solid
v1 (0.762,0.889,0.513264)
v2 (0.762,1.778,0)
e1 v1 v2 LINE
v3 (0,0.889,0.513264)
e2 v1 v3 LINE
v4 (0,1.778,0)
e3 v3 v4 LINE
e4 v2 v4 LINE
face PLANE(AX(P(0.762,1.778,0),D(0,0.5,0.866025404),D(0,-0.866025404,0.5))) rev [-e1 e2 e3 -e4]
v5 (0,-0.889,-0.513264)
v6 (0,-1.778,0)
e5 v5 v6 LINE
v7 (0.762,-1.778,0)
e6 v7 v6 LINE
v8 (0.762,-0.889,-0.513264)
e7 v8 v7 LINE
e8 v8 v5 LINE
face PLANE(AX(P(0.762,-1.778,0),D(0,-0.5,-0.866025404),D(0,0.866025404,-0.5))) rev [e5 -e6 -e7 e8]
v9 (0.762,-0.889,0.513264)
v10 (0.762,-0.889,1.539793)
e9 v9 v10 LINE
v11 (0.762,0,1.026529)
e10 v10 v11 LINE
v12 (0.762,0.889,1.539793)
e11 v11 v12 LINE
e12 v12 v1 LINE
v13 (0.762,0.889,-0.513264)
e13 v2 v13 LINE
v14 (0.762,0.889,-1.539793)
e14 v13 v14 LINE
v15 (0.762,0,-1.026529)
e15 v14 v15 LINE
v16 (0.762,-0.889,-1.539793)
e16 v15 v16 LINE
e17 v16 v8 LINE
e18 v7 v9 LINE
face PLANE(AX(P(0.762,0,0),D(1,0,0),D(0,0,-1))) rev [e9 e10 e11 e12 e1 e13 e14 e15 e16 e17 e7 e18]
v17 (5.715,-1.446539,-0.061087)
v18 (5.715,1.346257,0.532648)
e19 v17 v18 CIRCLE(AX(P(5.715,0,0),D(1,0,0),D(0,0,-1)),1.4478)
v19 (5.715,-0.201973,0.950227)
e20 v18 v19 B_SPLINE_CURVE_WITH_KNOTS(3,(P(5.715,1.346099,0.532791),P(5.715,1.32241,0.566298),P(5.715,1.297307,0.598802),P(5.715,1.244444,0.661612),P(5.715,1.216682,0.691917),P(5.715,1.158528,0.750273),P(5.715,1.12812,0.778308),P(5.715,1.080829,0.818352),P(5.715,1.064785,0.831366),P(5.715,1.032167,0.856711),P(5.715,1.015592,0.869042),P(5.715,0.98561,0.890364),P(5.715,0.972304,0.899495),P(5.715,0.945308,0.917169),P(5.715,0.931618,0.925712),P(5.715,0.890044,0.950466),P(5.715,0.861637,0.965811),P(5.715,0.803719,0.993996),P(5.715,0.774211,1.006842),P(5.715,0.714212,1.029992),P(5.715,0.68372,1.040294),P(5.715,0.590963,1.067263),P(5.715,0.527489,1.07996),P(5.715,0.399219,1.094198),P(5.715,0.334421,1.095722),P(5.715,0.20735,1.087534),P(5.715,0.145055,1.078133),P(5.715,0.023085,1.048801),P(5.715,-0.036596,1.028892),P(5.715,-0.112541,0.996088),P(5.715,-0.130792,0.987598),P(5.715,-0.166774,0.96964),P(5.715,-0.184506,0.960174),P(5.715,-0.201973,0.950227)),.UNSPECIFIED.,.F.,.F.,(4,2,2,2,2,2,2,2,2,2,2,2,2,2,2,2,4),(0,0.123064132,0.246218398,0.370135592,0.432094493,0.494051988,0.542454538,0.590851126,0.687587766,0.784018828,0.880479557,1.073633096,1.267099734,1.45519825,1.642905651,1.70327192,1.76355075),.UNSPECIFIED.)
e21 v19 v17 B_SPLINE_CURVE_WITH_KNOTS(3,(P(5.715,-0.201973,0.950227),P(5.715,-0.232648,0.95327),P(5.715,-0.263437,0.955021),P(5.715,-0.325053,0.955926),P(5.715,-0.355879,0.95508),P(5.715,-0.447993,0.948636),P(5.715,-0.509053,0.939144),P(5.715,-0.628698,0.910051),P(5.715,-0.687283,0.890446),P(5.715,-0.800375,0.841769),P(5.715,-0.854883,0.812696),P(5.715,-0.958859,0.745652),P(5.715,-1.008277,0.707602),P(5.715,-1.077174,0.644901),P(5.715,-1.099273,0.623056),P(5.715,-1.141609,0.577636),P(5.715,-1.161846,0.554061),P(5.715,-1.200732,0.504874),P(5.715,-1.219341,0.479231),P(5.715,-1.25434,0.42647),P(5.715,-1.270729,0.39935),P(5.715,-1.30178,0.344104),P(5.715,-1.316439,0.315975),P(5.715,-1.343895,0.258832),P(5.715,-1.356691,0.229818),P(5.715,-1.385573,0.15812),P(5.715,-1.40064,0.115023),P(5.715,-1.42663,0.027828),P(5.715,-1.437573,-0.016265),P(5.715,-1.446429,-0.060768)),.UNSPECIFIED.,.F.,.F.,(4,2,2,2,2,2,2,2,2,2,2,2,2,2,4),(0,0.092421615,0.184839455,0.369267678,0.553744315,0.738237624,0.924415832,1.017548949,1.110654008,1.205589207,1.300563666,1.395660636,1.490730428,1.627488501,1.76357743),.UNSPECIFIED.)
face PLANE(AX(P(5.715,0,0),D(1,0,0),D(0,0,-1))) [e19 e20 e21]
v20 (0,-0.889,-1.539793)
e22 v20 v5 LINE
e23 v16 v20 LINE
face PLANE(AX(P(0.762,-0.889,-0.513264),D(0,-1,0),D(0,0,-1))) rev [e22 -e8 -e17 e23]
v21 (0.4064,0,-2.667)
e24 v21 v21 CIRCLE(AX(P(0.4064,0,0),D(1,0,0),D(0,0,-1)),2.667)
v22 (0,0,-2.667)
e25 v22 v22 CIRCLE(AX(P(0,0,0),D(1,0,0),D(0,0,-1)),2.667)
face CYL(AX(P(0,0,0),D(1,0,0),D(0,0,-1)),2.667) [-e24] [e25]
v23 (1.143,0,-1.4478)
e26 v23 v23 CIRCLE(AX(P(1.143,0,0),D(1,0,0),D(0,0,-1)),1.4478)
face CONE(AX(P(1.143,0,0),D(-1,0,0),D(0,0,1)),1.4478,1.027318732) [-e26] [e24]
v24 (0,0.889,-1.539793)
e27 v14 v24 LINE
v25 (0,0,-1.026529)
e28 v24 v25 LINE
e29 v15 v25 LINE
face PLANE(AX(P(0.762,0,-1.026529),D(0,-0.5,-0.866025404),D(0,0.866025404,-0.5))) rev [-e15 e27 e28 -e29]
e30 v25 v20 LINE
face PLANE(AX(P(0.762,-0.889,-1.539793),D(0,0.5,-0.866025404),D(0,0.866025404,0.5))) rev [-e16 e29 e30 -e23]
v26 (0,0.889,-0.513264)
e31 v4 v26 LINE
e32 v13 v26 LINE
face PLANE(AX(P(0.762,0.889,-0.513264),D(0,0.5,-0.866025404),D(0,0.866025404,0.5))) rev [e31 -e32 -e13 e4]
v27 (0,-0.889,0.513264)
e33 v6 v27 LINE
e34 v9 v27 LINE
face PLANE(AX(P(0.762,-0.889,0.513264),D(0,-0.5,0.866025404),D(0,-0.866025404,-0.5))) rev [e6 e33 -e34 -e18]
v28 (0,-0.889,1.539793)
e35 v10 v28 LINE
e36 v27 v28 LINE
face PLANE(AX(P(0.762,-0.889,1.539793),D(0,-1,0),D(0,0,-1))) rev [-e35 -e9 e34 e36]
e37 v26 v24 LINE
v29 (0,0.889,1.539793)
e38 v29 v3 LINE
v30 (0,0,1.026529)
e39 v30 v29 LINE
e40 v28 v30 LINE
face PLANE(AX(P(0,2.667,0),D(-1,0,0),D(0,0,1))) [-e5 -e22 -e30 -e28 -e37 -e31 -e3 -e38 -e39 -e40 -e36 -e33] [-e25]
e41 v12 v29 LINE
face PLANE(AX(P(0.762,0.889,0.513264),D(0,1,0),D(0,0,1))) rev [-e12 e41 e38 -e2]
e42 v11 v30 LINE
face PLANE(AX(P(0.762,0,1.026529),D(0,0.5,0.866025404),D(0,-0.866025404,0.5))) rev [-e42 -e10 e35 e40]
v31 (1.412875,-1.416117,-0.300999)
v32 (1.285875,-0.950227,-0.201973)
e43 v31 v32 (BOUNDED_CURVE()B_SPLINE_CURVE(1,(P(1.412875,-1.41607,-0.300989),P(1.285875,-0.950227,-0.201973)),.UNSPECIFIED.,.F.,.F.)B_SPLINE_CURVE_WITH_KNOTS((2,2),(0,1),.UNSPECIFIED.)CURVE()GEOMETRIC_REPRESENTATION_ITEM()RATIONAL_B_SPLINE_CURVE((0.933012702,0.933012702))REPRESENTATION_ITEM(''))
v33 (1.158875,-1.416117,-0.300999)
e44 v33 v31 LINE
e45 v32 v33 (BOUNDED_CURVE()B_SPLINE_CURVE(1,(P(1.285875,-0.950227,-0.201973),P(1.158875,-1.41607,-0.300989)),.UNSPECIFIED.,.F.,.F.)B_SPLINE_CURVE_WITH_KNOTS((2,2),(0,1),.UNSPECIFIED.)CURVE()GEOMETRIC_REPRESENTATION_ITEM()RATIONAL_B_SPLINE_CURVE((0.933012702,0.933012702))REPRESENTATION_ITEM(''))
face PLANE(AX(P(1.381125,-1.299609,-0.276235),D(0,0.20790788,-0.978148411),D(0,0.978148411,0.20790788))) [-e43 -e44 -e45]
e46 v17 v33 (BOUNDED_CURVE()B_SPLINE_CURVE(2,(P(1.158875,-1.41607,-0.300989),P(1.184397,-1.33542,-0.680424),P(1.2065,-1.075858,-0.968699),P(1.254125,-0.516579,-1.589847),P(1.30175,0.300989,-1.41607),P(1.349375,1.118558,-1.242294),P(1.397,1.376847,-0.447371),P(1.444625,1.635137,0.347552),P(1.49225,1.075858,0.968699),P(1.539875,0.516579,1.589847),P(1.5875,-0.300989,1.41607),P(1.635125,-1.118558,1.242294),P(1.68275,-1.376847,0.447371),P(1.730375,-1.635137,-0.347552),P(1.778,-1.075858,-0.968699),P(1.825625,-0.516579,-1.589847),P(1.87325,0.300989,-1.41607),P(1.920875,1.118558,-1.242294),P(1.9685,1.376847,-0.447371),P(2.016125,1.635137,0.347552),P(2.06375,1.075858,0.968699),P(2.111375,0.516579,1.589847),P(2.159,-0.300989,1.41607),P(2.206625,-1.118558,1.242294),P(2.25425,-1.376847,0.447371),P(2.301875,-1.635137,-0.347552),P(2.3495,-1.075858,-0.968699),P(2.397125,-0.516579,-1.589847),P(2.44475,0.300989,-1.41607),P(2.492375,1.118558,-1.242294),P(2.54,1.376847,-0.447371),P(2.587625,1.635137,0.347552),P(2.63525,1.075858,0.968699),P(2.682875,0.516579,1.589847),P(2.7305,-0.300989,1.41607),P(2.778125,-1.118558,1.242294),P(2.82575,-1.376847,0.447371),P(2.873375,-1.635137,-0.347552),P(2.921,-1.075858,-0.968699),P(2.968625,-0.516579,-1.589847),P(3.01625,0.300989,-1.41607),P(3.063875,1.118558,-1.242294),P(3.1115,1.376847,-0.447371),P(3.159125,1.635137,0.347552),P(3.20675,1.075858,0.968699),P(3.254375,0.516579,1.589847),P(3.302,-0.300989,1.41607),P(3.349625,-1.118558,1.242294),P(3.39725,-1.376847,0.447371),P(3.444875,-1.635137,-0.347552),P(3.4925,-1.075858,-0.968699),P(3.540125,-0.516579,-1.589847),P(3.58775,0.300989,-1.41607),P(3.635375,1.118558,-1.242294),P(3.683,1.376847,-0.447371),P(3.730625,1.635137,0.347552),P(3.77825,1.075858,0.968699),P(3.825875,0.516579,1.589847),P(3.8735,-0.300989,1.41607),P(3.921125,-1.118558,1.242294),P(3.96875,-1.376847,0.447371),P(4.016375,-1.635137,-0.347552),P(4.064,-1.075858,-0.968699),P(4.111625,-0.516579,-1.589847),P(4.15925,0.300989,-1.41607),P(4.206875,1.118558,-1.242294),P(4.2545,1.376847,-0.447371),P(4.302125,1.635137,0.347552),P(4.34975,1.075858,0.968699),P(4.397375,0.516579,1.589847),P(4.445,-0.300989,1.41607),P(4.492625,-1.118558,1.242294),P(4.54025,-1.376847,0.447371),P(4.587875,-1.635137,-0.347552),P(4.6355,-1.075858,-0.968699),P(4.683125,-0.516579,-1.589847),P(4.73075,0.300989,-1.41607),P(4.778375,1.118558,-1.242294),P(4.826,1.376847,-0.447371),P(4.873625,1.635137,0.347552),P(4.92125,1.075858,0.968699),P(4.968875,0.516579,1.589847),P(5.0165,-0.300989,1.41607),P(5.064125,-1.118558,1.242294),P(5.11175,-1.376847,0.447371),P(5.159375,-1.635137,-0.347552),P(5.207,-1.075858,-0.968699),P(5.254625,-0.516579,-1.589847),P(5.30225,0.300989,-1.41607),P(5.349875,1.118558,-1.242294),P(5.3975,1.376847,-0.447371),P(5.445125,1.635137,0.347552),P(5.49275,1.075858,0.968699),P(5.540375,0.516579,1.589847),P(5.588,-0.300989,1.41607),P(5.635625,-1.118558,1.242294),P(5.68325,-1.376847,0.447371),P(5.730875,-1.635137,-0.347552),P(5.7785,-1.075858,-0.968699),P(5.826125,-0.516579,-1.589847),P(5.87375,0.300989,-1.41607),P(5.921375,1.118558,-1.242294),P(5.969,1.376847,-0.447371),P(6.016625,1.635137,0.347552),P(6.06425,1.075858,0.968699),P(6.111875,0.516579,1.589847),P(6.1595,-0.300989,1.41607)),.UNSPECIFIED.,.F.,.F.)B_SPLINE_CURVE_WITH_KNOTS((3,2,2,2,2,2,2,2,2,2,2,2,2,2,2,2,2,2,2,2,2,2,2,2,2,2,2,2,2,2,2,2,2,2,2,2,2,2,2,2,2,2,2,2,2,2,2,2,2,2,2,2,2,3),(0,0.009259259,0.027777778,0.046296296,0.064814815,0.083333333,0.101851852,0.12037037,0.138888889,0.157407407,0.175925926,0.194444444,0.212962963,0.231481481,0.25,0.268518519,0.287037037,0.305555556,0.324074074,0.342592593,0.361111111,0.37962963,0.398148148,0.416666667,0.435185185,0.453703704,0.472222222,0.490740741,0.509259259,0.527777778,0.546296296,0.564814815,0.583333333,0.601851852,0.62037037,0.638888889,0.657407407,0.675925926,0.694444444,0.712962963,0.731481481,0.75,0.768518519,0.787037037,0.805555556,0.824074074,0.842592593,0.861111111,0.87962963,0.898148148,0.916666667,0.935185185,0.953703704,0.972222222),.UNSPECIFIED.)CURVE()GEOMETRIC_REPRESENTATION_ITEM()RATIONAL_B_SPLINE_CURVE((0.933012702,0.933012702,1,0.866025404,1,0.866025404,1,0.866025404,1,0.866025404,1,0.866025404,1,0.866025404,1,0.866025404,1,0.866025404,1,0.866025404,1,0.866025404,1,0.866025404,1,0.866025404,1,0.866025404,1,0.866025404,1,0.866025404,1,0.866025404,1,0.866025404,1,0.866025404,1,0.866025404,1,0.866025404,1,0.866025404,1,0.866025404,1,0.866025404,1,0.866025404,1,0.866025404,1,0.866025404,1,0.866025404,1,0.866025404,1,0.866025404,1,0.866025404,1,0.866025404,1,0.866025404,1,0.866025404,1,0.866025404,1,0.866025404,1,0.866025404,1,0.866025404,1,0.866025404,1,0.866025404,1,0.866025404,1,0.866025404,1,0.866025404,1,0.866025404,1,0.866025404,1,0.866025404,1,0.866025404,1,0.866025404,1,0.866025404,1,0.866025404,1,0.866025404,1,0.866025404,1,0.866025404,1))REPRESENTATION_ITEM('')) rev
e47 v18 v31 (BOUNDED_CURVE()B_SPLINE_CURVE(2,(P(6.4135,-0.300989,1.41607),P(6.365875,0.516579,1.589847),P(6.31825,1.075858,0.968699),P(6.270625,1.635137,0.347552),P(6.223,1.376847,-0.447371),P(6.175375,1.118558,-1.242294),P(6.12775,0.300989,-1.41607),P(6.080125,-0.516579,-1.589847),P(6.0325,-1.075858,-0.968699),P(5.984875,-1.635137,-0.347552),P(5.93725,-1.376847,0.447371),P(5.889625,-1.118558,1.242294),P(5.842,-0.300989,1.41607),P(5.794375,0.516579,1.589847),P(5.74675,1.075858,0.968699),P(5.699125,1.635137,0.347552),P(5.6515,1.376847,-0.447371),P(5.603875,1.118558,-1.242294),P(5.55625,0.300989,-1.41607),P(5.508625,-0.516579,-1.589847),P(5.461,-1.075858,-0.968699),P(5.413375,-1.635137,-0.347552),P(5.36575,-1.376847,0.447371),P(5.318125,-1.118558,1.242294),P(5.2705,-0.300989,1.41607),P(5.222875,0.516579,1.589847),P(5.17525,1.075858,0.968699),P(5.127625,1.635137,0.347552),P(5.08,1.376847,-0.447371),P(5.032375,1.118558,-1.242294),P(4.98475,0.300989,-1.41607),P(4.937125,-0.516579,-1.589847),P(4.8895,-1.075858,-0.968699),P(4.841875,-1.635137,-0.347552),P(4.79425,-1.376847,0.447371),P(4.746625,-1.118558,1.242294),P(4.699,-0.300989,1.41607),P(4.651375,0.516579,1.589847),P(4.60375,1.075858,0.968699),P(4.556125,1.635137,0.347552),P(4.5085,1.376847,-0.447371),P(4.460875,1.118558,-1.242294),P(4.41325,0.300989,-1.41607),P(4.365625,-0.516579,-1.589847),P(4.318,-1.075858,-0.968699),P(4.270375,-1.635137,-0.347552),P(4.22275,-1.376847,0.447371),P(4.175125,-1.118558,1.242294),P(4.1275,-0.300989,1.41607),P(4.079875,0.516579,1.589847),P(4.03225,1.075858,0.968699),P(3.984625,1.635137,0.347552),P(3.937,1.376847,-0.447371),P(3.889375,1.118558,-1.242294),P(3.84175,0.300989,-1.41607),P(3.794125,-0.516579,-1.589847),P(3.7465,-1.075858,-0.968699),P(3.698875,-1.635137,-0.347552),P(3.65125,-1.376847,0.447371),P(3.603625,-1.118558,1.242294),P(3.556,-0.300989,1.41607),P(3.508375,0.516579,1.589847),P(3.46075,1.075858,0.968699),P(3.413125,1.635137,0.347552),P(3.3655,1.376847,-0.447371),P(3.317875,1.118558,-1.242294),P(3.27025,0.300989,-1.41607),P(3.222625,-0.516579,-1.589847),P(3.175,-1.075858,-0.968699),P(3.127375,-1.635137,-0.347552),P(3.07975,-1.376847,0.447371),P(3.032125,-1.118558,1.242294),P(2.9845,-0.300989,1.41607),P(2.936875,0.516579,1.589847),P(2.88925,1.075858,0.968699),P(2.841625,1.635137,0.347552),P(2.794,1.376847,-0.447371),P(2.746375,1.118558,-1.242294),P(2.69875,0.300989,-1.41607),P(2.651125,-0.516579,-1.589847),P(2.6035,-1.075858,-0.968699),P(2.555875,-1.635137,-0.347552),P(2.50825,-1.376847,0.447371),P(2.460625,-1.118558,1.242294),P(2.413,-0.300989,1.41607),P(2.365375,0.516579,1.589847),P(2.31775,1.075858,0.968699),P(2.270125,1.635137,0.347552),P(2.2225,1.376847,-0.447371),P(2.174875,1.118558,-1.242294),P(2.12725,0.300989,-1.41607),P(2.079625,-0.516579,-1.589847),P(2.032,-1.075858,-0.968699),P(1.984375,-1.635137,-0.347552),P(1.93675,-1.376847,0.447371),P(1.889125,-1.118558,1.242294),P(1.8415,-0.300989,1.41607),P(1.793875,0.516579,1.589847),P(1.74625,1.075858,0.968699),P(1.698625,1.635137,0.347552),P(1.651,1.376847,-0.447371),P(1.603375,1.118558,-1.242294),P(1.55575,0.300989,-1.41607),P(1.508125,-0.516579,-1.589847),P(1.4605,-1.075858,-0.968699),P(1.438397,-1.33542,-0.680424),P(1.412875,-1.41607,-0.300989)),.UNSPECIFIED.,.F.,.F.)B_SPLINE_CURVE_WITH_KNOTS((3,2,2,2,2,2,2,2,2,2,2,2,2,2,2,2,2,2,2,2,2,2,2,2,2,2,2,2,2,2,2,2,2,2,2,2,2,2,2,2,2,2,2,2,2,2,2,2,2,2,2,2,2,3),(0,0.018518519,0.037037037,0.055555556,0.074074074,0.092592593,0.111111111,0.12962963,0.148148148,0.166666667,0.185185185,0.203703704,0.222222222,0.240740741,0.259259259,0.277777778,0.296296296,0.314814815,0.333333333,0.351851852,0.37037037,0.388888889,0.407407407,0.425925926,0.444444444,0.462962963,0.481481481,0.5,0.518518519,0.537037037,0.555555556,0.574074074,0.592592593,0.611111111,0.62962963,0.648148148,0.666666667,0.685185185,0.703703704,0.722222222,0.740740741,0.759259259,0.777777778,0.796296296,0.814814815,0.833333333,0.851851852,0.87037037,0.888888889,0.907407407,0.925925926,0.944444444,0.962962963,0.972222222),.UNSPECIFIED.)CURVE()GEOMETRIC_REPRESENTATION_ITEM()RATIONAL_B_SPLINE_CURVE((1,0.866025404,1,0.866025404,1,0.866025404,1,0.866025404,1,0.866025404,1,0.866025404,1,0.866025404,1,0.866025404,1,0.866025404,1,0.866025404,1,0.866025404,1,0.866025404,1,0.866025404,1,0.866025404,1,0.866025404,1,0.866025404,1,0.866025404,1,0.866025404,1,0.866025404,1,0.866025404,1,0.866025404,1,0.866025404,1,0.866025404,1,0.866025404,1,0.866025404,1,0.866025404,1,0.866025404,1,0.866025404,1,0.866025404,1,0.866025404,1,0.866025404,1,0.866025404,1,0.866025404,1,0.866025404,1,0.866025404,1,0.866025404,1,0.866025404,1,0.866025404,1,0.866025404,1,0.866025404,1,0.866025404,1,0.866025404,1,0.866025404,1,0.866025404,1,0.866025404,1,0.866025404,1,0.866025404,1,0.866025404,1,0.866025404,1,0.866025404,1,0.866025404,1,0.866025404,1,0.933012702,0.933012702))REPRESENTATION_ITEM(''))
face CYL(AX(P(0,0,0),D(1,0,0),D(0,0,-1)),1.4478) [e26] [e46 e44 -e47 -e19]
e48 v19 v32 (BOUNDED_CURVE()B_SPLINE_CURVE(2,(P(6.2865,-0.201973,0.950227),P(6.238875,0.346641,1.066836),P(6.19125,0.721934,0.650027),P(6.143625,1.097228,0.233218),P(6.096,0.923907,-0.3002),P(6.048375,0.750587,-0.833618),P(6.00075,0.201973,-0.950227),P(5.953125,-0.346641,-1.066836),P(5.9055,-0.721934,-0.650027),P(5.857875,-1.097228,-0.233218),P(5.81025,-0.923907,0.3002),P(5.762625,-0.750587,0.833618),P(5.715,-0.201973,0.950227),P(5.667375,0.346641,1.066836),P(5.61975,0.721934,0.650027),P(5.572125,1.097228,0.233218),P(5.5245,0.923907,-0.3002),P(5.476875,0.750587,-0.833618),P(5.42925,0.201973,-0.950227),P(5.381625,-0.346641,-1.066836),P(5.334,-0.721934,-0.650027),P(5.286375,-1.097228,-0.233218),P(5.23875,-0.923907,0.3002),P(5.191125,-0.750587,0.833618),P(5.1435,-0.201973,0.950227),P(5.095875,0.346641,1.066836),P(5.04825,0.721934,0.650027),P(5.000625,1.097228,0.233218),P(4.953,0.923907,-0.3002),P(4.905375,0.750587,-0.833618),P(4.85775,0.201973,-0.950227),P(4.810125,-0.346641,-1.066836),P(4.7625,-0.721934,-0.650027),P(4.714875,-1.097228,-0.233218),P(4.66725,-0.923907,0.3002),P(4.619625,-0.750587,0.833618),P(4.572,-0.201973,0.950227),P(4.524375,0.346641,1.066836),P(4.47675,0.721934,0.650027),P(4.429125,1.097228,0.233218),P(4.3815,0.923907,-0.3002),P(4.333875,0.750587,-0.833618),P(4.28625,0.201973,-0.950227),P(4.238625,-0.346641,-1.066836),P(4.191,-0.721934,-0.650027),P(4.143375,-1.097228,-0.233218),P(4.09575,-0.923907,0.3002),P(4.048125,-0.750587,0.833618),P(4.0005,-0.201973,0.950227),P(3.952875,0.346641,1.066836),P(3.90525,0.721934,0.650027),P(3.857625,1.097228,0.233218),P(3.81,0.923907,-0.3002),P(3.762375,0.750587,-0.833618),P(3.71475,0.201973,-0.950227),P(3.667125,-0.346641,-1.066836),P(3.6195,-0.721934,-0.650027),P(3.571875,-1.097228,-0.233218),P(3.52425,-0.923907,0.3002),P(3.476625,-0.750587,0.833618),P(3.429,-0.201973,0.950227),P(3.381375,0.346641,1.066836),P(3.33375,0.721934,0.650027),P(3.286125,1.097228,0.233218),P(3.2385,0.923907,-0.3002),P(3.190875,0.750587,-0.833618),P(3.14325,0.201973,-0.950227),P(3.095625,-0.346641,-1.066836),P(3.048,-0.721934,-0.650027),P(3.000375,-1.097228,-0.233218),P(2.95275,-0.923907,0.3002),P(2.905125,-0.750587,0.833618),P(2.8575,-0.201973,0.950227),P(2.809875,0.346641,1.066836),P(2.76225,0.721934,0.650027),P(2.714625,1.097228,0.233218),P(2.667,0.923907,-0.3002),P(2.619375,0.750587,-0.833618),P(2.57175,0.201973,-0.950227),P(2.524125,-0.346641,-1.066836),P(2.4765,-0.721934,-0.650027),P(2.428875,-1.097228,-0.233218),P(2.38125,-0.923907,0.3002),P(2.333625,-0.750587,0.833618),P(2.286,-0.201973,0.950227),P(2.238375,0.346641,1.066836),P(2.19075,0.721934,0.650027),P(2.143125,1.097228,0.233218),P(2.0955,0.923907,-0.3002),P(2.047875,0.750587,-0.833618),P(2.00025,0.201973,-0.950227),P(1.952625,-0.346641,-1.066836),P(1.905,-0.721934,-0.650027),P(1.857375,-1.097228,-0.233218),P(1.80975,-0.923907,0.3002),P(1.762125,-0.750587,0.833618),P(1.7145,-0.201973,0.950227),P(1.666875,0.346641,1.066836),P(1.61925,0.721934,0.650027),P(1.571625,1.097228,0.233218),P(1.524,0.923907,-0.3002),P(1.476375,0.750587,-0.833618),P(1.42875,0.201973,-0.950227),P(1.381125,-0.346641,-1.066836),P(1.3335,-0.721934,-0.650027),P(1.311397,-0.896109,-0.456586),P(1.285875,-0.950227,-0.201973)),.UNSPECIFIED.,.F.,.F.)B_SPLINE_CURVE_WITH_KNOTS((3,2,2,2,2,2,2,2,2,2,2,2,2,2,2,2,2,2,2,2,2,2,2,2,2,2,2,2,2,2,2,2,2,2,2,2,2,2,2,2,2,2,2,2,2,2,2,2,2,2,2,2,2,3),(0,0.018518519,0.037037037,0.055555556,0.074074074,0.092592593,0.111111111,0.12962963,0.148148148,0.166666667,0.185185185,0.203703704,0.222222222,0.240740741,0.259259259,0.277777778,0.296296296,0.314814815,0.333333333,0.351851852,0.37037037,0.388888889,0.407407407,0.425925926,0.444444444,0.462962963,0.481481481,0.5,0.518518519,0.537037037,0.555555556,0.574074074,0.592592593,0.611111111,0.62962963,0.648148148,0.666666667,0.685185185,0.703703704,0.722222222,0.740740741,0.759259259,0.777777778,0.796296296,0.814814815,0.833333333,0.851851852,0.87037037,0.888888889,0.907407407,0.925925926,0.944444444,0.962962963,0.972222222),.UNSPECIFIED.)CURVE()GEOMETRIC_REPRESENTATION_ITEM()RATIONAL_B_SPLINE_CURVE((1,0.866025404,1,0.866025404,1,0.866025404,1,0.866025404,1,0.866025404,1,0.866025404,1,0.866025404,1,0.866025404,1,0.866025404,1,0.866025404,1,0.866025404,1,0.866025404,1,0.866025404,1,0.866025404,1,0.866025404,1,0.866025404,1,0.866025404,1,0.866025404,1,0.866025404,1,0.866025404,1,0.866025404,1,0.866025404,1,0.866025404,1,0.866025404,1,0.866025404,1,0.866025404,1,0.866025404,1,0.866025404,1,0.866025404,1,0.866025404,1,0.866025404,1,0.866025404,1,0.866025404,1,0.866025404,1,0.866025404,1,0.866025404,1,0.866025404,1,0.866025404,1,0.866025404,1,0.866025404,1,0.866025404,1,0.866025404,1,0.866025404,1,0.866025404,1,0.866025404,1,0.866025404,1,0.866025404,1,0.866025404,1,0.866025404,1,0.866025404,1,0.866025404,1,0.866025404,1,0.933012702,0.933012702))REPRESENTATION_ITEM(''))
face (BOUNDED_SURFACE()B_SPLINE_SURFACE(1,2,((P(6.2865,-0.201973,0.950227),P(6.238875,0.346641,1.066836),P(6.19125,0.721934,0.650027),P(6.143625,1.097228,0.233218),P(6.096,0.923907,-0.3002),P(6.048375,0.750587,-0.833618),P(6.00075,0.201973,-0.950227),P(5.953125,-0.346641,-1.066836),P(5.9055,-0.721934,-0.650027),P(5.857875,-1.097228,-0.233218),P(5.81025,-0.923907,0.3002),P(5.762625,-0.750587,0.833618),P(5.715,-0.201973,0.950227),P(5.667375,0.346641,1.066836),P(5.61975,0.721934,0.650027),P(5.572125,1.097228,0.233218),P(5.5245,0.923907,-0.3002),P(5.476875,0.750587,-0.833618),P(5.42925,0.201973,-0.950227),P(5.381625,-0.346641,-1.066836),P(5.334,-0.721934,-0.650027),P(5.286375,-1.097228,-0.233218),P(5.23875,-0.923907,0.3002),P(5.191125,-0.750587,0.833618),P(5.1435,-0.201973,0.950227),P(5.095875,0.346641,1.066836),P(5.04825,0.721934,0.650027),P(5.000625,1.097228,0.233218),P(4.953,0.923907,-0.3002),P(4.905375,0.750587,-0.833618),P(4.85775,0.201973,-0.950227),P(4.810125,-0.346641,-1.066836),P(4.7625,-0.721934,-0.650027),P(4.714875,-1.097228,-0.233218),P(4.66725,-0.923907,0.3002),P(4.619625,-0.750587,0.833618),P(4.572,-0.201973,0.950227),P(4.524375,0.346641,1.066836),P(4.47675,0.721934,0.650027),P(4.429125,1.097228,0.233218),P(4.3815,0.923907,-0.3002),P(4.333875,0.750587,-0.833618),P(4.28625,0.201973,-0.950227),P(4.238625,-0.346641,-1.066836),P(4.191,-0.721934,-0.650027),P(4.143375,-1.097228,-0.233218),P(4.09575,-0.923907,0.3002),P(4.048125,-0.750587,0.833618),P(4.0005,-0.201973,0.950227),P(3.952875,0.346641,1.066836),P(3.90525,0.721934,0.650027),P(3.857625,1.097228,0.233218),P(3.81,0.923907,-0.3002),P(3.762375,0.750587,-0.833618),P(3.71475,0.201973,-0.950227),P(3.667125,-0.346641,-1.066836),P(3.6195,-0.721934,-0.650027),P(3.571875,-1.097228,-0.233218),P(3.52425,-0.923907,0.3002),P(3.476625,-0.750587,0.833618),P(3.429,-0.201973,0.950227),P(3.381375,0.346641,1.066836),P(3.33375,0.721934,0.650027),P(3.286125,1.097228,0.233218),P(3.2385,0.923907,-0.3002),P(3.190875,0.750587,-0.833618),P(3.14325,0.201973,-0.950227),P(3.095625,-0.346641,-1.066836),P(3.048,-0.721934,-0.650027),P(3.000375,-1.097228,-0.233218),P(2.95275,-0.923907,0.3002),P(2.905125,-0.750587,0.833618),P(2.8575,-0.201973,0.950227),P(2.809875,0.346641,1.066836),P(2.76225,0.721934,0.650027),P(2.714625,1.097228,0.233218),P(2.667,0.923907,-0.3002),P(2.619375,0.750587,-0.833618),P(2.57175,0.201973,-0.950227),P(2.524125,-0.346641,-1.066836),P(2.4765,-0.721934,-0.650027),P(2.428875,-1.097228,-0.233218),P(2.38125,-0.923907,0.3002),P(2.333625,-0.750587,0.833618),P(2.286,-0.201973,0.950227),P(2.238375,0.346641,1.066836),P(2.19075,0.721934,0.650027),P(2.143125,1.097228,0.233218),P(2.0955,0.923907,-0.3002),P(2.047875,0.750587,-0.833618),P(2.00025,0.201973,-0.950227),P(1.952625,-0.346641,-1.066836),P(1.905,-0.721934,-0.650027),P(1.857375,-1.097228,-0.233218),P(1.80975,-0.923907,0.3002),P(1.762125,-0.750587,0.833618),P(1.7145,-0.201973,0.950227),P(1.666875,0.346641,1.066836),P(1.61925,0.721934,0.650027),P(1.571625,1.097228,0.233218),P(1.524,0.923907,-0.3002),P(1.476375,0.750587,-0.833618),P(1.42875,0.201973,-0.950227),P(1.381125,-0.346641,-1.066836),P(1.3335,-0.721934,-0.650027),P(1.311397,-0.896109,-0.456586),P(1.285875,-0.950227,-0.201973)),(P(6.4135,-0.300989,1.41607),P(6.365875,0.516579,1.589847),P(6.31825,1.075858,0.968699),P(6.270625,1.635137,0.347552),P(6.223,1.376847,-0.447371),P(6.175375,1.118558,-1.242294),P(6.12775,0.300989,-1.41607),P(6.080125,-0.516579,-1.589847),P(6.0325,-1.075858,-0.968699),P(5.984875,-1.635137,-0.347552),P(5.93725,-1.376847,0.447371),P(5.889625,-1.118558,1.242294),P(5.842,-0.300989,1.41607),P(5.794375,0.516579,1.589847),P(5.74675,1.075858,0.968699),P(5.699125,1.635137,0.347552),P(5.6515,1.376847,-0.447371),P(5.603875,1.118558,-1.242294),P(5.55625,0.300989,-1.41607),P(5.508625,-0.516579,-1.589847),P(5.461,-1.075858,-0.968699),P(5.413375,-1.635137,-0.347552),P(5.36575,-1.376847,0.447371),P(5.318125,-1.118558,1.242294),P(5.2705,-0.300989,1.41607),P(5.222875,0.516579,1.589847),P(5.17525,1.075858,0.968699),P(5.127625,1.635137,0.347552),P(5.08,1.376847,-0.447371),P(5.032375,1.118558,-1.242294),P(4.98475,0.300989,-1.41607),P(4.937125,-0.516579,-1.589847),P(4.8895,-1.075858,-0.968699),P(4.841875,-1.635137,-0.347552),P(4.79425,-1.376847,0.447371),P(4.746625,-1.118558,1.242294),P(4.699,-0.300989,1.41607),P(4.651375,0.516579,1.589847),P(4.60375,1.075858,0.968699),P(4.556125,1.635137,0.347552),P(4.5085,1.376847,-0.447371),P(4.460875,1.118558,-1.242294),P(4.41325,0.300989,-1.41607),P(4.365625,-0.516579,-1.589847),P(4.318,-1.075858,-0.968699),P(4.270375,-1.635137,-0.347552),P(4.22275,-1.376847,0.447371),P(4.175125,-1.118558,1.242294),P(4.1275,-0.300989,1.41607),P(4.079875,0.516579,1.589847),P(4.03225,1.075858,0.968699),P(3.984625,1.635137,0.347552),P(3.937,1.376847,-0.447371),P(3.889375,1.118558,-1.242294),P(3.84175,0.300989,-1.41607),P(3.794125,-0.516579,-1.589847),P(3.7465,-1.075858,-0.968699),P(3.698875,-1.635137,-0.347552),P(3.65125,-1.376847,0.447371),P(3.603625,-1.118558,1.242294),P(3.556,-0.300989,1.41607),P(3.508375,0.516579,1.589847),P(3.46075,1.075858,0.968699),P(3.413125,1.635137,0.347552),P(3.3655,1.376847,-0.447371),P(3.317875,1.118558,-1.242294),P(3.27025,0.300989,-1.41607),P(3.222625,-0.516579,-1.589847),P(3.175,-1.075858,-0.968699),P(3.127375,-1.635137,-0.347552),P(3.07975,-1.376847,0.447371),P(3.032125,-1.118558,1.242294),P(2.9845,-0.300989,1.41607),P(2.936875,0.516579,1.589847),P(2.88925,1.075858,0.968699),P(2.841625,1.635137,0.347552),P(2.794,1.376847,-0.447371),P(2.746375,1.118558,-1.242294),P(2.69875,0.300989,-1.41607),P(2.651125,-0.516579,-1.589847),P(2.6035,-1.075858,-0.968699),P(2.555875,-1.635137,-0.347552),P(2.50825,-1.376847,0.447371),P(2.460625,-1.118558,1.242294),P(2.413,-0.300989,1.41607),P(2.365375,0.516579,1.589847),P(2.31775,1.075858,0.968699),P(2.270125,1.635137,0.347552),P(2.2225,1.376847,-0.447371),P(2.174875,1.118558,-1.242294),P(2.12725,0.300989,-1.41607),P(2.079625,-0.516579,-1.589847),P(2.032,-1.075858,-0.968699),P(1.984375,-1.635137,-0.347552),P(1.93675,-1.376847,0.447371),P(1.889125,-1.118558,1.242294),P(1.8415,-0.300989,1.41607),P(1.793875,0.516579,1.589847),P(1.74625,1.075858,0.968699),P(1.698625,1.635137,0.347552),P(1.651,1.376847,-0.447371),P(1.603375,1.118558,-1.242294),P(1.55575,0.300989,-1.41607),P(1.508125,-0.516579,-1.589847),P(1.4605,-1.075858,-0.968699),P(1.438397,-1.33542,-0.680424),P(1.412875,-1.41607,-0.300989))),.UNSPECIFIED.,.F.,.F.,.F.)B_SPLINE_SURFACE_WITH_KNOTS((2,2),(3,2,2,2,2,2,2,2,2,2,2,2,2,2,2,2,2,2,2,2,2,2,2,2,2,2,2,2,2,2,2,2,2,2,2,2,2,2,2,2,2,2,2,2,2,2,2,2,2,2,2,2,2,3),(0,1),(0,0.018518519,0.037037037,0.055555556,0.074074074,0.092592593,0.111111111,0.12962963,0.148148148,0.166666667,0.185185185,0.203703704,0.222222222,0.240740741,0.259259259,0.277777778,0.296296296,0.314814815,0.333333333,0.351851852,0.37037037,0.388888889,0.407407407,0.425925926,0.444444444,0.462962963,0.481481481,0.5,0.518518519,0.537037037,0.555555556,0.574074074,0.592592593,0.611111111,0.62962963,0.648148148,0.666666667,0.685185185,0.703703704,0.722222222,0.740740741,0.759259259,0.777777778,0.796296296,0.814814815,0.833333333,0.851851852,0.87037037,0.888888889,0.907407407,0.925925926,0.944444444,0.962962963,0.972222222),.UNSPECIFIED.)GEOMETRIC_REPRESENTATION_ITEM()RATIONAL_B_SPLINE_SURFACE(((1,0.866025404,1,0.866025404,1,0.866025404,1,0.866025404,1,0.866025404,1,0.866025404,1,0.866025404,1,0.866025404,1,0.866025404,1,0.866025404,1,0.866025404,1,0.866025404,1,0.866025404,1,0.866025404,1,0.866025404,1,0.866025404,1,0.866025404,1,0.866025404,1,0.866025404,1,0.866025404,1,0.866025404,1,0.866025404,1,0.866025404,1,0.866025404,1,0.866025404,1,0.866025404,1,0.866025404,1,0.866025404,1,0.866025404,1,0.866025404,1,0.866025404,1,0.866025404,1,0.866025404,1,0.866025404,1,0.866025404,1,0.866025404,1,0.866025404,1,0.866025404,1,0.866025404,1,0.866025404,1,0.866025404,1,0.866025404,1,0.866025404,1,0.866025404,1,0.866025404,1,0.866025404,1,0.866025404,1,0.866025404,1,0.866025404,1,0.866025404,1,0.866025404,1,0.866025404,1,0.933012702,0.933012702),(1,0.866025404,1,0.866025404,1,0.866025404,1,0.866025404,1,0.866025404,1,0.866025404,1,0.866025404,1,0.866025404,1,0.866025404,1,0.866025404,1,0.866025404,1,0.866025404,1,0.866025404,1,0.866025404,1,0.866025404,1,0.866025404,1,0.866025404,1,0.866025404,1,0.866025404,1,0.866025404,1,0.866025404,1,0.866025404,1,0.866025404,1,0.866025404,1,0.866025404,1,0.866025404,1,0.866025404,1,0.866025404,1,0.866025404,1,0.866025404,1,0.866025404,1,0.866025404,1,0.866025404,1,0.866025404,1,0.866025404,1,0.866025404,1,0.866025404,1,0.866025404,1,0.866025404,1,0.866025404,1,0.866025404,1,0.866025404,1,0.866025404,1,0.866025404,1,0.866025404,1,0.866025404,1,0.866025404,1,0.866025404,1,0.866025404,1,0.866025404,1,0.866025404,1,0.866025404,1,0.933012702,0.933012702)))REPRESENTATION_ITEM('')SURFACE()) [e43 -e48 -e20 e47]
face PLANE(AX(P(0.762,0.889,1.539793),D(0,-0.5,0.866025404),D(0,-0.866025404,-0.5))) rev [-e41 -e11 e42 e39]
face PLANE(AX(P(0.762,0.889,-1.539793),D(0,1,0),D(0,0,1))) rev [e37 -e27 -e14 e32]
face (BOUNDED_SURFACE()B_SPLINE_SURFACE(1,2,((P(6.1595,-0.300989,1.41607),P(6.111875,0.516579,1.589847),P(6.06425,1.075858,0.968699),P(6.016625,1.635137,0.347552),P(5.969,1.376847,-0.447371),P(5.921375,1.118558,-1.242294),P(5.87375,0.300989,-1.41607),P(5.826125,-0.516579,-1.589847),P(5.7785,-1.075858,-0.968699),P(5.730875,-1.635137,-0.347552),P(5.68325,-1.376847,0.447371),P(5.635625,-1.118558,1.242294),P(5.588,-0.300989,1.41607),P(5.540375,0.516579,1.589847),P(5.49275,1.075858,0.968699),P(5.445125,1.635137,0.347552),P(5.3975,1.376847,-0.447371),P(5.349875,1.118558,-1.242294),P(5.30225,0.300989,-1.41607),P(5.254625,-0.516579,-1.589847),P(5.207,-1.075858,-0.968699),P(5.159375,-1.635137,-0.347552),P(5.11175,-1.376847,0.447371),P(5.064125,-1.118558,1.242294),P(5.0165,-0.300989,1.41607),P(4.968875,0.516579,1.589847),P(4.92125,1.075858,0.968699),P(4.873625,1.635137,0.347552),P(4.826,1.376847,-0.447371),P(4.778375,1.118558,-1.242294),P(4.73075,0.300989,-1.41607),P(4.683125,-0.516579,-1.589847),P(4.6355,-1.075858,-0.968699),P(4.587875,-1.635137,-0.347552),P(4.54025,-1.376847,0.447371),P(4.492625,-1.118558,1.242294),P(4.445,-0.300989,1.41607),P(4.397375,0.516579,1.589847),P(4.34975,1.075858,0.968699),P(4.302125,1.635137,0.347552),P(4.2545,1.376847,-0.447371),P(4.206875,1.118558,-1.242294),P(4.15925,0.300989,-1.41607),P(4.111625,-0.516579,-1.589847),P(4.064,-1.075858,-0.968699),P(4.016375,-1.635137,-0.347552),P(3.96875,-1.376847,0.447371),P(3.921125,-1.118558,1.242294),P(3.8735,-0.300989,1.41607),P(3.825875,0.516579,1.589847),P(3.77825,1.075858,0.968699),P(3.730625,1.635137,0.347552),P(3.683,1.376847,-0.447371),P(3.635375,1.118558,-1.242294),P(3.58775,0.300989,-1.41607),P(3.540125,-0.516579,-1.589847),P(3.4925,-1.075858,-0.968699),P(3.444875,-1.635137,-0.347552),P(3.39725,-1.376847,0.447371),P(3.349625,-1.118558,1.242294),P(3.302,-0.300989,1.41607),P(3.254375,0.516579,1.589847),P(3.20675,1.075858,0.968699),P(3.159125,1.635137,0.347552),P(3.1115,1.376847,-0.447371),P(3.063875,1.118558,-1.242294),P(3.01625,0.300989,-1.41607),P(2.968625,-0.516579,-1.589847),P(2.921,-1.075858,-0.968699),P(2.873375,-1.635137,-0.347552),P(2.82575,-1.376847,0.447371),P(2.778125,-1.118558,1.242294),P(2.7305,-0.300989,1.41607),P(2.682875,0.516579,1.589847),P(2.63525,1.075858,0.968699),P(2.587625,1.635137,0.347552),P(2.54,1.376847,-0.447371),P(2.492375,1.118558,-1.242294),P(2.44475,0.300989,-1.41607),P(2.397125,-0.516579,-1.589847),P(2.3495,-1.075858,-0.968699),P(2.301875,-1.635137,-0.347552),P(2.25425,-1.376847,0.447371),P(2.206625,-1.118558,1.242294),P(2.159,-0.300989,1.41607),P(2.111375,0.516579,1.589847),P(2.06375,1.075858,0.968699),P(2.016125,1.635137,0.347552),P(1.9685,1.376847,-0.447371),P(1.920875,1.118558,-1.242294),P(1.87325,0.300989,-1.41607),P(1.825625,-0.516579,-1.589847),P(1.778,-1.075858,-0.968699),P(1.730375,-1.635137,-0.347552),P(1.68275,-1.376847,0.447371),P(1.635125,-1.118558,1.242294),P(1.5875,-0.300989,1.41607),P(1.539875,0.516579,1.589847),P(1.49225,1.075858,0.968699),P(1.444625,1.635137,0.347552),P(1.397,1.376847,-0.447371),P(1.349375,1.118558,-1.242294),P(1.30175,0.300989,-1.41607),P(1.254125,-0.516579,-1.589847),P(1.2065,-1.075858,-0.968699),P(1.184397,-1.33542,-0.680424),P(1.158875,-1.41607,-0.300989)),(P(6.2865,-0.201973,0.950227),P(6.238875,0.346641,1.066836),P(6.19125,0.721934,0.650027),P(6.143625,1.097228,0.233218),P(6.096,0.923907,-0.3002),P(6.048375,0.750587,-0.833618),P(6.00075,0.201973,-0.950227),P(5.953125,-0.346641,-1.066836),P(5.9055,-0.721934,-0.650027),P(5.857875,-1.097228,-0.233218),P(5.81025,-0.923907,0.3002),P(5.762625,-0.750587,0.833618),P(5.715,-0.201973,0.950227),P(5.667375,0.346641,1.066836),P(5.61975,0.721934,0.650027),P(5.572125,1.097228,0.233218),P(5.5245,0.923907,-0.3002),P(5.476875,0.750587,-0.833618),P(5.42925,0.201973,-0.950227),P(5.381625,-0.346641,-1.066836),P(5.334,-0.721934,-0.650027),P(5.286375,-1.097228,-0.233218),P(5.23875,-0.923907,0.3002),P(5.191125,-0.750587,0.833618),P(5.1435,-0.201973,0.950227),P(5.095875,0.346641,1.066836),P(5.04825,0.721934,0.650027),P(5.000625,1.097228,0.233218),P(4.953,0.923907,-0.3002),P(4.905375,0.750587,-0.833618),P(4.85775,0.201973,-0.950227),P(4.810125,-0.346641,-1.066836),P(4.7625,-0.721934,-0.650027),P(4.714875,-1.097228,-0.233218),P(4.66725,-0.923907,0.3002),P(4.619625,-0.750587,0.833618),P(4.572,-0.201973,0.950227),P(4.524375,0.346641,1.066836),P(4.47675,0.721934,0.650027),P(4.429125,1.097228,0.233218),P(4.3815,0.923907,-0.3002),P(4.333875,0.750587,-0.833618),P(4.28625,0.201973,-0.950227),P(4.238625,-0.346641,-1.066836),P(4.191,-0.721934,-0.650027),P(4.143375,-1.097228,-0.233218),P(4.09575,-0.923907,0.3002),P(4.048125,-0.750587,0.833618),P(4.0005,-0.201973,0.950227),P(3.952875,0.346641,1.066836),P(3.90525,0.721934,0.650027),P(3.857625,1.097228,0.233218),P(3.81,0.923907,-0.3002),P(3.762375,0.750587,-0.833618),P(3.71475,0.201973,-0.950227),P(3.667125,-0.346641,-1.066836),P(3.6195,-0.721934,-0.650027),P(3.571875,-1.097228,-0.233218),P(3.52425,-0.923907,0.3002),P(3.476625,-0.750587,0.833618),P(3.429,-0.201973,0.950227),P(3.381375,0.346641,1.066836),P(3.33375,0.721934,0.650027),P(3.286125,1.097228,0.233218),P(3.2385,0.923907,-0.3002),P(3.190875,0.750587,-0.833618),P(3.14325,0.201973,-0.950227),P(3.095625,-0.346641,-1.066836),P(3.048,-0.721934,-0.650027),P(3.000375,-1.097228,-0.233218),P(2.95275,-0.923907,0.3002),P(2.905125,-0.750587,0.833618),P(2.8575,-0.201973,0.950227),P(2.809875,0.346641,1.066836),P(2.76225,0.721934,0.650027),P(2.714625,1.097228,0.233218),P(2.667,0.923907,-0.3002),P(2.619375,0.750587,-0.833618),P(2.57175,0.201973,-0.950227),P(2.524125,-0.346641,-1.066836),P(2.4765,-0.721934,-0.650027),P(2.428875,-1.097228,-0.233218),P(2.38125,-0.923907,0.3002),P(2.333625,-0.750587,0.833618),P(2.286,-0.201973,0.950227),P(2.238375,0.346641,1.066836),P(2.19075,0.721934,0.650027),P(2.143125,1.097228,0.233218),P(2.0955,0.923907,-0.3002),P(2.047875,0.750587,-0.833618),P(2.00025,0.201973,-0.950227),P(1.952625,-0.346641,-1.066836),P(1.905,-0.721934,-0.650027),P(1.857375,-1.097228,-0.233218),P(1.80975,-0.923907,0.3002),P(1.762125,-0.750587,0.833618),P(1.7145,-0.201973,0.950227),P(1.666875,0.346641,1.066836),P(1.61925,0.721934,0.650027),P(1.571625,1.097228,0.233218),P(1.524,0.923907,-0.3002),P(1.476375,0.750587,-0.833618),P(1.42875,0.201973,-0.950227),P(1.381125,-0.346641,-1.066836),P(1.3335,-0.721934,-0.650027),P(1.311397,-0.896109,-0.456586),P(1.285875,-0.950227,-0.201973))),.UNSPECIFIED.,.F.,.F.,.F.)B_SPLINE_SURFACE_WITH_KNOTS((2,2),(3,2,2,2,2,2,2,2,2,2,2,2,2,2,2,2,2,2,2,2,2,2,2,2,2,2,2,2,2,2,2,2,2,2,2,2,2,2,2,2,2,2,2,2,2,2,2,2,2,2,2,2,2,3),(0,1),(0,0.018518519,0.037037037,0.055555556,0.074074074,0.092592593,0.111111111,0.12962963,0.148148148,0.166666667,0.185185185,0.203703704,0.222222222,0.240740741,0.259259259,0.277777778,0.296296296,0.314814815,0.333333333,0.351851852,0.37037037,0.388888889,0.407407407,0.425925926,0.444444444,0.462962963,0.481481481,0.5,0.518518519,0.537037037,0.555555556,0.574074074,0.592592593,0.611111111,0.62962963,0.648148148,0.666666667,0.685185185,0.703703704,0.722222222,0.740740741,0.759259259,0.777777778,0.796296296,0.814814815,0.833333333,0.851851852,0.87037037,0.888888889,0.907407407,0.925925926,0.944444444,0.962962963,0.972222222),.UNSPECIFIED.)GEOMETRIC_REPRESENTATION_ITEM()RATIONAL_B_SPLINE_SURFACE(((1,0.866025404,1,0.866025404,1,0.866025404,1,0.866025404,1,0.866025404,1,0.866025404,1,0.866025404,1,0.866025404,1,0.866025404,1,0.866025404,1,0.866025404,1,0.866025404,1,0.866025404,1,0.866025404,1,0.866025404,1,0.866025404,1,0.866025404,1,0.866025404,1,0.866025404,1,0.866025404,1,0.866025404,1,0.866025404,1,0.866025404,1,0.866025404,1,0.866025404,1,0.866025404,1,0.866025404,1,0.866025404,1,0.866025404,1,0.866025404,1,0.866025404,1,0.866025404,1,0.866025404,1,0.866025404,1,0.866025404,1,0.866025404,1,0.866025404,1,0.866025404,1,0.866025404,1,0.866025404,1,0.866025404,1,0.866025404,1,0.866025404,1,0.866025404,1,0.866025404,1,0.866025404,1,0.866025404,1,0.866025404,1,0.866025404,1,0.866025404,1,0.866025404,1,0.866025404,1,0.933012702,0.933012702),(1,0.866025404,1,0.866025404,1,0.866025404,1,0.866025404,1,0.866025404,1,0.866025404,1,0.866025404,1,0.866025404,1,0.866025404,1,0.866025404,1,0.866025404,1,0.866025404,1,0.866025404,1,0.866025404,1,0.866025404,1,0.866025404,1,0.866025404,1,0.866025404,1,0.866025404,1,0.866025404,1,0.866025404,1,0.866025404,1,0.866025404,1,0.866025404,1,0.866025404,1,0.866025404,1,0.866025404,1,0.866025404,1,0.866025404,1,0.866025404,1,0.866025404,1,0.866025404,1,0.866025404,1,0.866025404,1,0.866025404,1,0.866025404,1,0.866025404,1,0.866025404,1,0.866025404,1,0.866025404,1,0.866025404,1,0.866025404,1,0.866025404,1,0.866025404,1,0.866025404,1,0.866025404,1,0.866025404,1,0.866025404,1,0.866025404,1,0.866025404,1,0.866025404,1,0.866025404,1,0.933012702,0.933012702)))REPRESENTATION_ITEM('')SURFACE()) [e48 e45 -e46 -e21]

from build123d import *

# Parameters (mm, degrees)
CUT_EXTRUDE1_DEPTH = 0.762
CIRPATTERN1_COUNT  = 6
CUT_SWEEP1_PITCH   = 0.5715


with BuildPart() as part:
    # Sketch1 → Revolve1 (revolve)
    with BuildSketch(Plane.XY, mode=Mode.PRIVATE) as revolve1_sk:
        Polygon((0, 0), (5.715, 0), (5.715, 1.4478), (1.143, 1.4478), (0.4064, 2.667), (0, 2.667), align=None)
    revolve(revolve1_sk.sketch.rotate(Axis((0, 0, 0), (-1, 0, 0)), 90), axis=Axis((0, 0, 0), (-1, 0, 0)))

    # Sketch2 → Cut-Extrude1 (cut)
    with BuildSketch(Plane.ZY):
        Polygon((0, 1.778), (0.513264389, 0.889), (1.539793168, 0.889), (0, 0), align=None)
    cut_extrude1 = extrude(amount=-CUT_EXTRUDE1_DEPTH, mode=Mode.SUBTRACT)

    # CirPattern1: Cut-Extrude1 ×6 about axis
    cirpattern1_axis = Axis((0, 0, 0), (1, 0, 0))
    for i in range(1, CIRPATTERN1_COUNT):
        add(cut_extrude1.rotate(cirpattern1_axis, i * 360 / CIRPATTERN1_COUNT), mode=Mode.SUBTRACT)

    # Cut-Sweep1: arcs per turn and ends read off the stored shape
    # Cut-Sweep1: the profile of Sketch5 profile screwed along a right-hand helix through 8.75 turns, 6 arcs to a turn; built about Z, then put on its axis
    cut_sweep1_z = Axis((0, 0, 0), (0, 0, 1))
    cut_sweep1_corners = [(1.448004946, 5.56e-06, -0.444420005), (1.448004946, 5.56e-06, -0.698580005), (0.971454946, 3.73e-06, -0.571500005)]
    with BuildLine(mode=Mode.PRIVATE) as cut_sweep1_profile:
        Line(cut_sweep1_corners[0], cut_sweep1_corners[1])
        Line(cut_sweep1_corners[1], cut_sweep1_corners[2])
        Line(cut_sweep1_corners[2], cut_sweep1_corners[0])
    cut_sweep1_cap = Face(cut_sweep1_profile.wire())
    cut_sweep1_turn_angles = [0, 30, 60, 90, 120, 150, 180, 210, 240, 270, 300, 330, 360]
    cut_sweep1_turn_weights = [1, 0.8660254037844387, 1, 0.8660254037844387, 1, 0.8660254037844387, 1, 0.8660254037844387, 1, 0.8660254037844387, 1, 0.8660254037844387, 1]
    cut_sweep1_turn_rails = [Edge.make_bspline([Vector(p[0], p[1], 0).rotate(cut_sweep1_z, cut_sweep1_turn_angles[k]) / cut_sweep1_turn_weights[k] + Vector(0, 0, p[2] + CUT_SWEEP1_PITCH * cut_sweep1_turn_angles[k] / 360) for k in range(13)], [0, 0, 0, 1, 1, 2, 2, 3, 3, 4, 4, 5, 5, 6, 6, 6], 2, cut_sweep1_turn_weights) for p in cut_sweep1_corners]
    cut_sweep1_turn_sides = [Face.make_surface_from_curves(cut_sweep1_turn_rails[p[0]], cut_sweep1_turn_rails[p[1]]) for p in [(0, 1), (1, 2), (2, 0)]]
    cut_sweep1_last_angles = [2880, 2910, 2940, 2970, 3000, 3030, 3060, 3090, 3120, 3135, 3150]
    cut_sweep1_last_weights = [1, 0.8660254037844387, 1, 0.8660254037844387, 1, 0.8660254037844387, 1, 0.8660254037844387, 1, 0.9659258262890683, 1]
    cut_sweep1_last_rails = [Edge.make_bspline([Vector(p[0], p[1], 0).rotate(cut_sweep1_z, cut_sweep1_last_angles[k]) / cut_sweep1_last_weights[k] + Vector(0, 0, p[2] + CUT_SWEEP1_PITCH * cut_sweep1_last_angles[k] / 360) for k in range(11)], [0, 0, 0, 1, 1, 2, 2, 3, 3, 4, 4, 5, 5, 5], 2, cut_sweep1_last_weights) for p in cut_sweep1_corners]
    cut_sweep1_last_sides = [Face.make_surface_from_curves(cut_sweep1_last_rails[p[0]], cut_sweep1_last_rails[p[1]]) for p in [(0, 1), (1, 2), (2, 0)]]
    cut_sweep1 = Plane(origin=(5.715, 0, 0), x_dir=(0, -0.2079116908177638, 0.9781476007338047), z_dir=(-1, 0, 0)) * Solid(Shell([*[p.moved(Location((0, 0, CUT_SWEEP1_PITCH * i))) for i in range(8) for p in cut_sweep1_turn_sides], *cut_sweep1_last_sides, cut_sweep1_cap, cut_sweep1_cap.rotate(cut_sweep1_z, 3150).moved(Location((0, 0, CUT_SWEEP1_PITCH * 3150 / 360)))]))
    add(cut_sweep1, mode=Mode.SUBTRACT)


solid = part.part
